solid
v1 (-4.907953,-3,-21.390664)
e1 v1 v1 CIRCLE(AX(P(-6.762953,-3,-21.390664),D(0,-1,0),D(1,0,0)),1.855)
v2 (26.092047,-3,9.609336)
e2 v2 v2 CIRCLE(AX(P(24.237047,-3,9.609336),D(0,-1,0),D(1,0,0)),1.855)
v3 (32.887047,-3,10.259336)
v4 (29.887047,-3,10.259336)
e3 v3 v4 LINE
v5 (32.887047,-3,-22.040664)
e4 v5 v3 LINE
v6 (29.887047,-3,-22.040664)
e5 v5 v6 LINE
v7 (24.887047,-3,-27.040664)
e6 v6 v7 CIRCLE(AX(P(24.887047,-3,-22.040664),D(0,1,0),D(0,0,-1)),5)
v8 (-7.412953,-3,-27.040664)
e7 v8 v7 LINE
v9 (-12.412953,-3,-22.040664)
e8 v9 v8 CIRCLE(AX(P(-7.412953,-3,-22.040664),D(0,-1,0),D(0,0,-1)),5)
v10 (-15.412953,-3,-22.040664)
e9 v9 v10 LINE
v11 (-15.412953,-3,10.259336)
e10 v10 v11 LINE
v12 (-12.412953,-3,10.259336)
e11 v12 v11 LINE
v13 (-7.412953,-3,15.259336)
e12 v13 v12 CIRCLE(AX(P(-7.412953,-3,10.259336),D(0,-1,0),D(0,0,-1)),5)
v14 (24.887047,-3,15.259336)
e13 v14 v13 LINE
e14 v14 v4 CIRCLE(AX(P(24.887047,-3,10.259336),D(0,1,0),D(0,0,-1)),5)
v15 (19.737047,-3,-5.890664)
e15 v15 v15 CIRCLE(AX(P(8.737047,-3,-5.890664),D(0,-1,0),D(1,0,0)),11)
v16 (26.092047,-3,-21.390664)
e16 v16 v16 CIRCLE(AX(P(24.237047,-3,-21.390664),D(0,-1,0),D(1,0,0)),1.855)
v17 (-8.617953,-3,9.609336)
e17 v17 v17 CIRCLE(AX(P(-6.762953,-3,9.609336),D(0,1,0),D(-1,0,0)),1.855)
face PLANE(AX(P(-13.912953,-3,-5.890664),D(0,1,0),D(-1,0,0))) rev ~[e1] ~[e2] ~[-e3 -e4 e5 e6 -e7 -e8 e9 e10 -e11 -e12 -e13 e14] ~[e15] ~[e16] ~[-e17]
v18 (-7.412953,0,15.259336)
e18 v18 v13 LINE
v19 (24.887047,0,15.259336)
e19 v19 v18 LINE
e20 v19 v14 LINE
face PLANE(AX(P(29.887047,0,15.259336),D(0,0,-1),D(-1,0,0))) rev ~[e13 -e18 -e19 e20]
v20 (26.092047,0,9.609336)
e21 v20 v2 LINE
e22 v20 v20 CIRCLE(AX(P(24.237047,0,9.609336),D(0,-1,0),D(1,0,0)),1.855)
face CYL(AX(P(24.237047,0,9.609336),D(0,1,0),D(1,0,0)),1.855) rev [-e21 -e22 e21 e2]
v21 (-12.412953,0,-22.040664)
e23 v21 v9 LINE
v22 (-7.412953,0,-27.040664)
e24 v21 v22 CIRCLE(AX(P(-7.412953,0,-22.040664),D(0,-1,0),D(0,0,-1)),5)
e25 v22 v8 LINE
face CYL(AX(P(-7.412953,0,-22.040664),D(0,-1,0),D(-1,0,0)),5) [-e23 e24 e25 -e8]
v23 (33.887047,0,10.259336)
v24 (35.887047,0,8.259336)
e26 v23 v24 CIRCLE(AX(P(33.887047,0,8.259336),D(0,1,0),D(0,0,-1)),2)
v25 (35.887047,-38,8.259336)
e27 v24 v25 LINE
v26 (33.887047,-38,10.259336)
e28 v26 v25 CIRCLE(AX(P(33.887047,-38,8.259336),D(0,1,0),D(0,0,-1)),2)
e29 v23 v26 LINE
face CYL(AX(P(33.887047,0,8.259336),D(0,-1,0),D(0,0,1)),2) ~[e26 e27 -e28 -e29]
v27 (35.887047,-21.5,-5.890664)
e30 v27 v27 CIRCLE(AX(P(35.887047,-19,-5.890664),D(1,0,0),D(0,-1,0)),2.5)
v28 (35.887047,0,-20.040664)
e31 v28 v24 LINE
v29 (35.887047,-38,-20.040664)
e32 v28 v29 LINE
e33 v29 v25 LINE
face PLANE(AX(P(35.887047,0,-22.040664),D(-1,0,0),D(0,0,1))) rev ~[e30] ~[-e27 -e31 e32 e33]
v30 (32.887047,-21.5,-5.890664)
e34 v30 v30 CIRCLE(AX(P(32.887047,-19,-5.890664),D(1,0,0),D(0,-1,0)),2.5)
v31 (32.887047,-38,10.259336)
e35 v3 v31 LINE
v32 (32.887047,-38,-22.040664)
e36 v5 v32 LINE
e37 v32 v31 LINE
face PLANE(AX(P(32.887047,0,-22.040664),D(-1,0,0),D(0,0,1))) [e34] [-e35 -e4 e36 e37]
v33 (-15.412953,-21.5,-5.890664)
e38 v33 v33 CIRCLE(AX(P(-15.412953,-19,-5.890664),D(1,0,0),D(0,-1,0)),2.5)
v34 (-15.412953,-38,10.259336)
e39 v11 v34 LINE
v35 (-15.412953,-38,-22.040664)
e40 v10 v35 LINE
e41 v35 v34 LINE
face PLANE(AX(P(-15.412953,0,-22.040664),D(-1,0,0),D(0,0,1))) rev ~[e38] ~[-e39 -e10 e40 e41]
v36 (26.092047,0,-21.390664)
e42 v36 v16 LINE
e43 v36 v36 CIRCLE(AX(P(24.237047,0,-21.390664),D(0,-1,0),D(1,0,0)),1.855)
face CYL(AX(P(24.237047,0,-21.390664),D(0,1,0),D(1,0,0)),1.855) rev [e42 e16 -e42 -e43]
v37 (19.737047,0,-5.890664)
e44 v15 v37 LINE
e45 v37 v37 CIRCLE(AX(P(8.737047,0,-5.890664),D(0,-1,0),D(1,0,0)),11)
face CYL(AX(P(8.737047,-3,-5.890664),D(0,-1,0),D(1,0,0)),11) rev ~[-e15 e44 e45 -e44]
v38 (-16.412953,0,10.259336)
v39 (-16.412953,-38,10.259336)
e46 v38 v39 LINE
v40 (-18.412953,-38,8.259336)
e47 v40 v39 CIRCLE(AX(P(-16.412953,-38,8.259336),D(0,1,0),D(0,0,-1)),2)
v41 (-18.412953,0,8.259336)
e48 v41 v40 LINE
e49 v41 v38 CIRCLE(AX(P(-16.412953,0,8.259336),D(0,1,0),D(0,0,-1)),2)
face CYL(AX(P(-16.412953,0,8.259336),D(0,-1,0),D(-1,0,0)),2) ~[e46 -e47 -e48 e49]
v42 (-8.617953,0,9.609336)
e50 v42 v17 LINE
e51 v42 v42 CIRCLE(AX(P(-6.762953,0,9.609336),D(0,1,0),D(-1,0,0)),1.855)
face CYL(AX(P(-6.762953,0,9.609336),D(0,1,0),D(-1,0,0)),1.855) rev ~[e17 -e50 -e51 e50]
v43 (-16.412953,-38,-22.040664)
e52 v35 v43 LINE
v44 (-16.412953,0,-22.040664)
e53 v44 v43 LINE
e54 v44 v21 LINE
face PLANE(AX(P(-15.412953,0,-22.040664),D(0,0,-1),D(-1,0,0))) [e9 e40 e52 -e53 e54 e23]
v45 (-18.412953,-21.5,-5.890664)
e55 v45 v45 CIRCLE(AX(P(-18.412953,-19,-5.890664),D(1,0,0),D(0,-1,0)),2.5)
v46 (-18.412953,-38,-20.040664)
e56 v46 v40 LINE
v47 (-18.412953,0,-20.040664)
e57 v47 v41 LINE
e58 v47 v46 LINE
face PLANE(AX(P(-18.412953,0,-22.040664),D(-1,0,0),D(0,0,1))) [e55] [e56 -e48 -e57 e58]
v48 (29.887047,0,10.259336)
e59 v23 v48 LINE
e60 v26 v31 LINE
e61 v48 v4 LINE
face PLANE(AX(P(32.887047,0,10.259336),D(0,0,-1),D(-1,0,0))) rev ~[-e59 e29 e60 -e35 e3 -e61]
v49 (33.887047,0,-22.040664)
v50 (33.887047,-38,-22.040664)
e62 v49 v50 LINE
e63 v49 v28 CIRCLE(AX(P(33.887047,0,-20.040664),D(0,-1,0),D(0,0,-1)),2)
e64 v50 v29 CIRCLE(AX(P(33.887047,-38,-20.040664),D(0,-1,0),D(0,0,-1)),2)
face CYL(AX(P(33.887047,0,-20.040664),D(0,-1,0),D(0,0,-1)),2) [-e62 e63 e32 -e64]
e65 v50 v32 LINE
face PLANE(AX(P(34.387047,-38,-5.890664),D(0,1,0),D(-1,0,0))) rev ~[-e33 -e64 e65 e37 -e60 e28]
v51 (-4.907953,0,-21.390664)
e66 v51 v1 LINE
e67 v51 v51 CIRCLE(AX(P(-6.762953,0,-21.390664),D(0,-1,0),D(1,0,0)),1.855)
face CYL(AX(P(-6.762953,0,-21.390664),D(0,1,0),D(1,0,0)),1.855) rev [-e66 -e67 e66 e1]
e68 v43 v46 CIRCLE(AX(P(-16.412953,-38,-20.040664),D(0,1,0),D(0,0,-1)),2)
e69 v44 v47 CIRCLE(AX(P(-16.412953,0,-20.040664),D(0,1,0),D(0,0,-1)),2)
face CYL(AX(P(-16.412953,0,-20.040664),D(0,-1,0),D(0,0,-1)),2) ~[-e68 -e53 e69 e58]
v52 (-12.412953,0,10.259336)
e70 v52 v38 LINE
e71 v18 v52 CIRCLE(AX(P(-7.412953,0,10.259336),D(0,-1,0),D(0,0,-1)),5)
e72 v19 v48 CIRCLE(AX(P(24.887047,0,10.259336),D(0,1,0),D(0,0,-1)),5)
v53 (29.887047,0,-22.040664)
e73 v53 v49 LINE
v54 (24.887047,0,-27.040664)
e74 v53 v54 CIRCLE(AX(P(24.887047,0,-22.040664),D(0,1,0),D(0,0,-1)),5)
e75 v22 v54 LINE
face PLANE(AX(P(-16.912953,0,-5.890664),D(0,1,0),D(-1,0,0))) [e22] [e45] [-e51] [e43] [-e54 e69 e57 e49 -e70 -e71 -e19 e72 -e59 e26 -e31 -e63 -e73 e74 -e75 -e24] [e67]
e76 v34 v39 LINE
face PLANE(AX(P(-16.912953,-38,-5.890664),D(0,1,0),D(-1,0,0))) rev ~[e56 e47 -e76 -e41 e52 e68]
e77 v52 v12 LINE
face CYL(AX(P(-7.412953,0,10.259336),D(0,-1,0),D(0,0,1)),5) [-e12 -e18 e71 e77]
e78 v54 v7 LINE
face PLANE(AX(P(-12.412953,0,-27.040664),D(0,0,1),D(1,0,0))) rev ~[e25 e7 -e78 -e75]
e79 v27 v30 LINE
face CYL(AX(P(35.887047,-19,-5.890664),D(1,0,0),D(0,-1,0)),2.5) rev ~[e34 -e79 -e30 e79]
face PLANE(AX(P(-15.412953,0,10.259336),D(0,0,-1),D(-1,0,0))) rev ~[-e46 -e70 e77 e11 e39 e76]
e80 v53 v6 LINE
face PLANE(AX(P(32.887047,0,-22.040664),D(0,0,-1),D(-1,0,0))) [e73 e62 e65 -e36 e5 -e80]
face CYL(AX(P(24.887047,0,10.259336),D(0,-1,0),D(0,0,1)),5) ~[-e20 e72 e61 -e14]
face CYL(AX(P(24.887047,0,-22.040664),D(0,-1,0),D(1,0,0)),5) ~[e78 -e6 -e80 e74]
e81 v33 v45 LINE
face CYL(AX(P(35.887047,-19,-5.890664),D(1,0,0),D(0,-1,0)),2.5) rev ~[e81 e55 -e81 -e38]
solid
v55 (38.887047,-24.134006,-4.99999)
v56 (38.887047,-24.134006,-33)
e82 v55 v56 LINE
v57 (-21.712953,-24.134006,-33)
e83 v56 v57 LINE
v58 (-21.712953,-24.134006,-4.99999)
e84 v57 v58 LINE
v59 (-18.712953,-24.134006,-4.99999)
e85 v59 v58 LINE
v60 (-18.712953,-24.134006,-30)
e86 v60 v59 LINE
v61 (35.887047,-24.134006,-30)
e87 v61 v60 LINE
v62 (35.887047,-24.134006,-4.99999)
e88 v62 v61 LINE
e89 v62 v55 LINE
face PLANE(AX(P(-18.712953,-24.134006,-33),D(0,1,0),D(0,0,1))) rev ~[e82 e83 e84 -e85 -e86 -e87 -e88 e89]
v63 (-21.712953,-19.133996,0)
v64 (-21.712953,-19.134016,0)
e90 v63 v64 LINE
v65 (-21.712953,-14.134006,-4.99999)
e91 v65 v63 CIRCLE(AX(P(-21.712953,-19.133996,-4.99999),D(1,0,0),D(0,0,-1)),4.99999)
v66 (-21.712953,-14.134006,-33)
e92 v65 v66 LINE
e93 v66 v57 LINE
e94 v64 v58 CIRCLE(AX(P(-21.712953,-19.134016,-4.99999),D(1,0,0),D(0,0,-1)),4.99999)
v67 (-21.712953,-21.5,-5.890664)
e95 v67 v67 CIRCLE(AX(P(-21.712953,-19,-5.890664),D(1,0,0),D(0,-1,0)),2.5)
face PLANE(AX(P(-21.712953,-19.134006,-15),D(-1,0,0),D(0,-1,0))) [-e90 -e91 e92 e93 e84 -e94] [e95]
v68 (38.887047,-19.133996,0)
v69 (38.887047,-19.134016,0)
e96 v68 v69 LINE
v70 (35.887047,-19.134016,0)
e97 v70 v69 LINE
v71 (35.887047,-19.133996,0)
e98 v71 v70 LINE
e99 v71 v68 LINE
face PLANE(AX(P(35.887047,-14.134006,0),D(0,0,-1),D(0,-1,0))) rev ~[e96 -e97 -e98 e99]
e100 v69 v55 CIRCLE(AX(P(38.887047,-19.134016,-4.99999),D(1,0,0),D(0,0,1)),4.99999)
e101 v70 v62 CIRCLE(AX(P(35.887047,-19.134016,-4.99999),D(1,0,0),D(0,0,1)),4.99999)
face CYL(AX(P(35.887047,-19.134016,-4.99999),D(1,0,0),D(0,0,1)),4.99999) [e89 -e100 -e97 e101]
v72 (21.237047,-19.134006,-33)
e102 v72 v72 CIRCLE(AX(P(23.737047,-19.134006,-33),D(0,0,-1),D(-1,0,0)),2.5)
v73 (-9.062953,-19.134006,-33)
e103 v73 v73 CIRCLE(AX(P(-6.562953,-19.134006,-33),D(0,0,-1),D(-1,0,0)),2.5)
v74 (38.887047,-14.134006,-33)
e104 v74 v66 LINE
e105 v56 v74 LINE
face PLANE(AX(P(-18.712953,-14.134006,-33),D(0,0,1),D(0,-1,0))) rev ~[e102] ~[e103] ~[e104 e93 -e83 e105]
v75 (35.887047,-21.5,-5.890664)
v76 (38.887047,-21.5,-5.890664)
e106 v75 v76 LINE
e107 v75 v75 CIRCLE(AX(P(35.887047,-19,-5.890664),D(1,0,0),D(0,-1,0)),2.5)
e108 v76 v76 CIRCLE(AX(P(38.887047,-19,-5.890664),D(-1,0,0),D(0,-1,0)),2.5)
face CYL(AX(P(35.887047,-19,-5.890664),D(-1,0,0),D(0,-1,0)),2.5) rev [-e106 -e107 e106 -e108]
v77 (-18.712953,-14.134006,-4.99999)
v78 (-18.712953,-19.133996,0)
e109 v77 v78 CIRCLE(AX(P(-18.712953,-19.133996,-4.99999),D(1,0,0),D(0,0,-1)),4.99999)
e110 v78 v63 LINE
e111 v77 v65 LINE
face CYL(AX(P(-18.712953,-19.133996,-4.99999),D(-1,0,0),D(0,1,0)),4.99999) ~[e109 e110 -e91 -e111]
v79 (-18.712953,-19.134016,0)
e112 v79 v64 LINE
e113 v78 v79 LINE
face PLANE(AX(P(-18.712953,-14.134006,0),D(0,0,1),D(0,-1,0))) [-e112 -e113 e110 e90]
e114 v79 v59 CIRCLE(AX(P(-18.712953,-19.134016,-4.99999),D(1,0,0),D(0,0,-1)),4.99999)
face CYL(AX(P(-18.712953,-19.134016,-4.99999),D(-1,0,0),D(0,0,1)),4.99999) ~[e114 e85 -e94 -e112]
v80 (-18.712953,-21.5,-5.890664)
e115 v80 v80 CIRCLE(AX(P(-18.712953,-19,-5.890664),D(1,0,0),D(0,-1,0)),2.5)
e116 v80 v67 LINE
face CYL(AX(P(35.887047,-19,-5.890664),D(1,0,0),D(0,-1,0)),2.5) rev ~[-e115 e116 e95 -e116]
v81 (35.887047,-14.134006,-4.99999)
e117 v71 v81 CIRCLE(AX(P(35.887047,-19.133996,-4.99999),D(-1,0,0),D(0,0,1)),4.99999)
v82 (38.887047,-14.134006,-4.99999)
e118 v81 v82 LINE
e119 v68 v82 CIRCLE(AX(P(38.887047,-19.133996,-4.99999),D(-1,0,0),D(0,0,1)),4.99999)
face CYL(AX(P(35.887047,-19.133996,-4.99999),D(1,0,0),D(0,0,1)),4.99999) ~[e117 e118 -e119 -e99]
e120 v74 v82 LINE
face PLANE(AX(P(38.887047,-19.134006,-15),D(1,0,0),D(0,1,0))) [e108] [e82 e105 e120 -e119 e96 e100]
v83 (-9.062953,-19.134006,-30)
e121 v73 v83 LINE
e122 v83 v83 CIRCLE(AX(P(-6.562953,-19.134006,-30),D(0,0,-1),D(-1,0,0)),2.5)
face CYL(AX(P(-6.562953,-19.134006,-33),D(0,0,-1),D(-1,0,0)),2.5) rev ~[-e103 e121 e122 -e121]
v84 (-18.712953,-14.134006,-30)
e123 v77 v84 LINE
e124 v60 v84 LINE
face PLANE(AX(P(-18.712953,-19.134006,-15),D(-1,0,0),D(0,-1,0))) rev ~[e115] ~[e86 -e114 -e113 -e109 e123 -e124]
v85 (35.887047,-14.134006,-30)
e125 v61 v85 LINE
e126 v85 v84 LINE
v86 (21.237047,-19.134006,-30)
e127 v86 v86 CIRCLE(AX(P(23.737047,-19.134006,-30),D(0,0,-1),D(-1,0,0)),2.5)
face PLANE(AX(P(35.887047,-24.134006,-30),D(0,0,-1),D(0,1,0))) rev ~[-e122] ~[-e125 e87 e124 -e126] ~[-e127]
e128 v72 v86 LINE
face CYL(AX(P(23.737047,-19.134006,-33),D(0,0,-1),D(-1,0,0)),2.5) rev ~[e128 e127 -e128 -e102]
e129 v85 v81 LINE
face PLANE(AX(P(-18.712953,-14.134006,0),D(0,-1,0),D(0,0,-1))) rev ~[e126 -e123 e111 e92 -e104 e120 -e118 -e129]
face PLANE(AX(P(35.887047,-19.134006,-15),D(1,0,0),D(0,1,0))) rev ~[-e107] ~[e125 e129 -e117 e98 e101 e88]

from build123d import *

# Parameters (mm, degrees)
F0_R           = 1.855
F1_DEPTH       = 3
F2_R           = 5
F3_W           = 3
F3_H           = 32.3
F4_DEPTH       = 3
F5_DEPTH       = 38
F6_R           = 2
F8_R           = 11
F9_DEPTH       = 3.001
F10_W          = 10
F10_H          = 3
F11_DEPTH      = 3
F12_R          = 4.99999
F13_DEPTH      = 54.6
F14_W          = 10
F14_H          = 30
F14_H_2        = 3
F15_DEPTH      = 3
F16_DEPTH      = 57.601
F16_DEPTH_BACK = 3.001
F17_R          = 4.99999
F19_DEPTH      = 25


# Not quite as in the source:
# - a fillet or chamfer is up to 0.001 mm smaller than in the source, because OpenCascade refuses the exact size


with BuildPart() as f1:
    # F0 (on Front) → F1 (new body)
    with BuildSketch(Plane.XZ):
        Polygon((29.887046665, 15.2593358934), (-12.412953335, 15.2593358934), (-12.412953335, 9.6093358934), (-12.412953335, -27.0406641066), (29.887046665, -27.0406641066), align=None)
        with Locations((-6.762953335, -21.3906641066)):
            Circle(F0_R, mode=Mode.SUBTRACT)
        with Locations((24.237046665, -21.3906641066)):
            Circle(F0_R, mode=Mode.SUBTRACT)
        with BuildLine():
            ThreePointArc((-4.907953335, 9.6093358934), (-6.762953335, 7.7543358934), (-8.617953335, 9.6093358934))
            ThreePointArc((-8.617953335, 9.6093358934), (-6.762953335, 11.4643358934), (-4.907953335, 9.6093358934))
        make_face(mode=Mode.SUBTRACT)
        with Locations((24.237046665, 9.6093358934)):
            Circle(F0_R, mode=Mode.SUBTRACT)
    extrude(amount=F1_DEPTH)

    # F2
    f2_edges = [f1.edges().sort_by_distance(p)[0] for p in [
        (29.887047, -1.5, 15.259336),
        (29.887047, -1.5, -27.040664),
        (-12.412953, -1.5, 15.259336),
        (-12.412953, -1.5, -27.040664),
    ]]
    fillet(f2_edges, radius=F2_R)

    # F3 (on face) → F4 (join)
    with BuildSketch(Plane(origin=(0, 0, 0), x_dir=(-1, 0, 0), z_dir=(0, 1, 0))):
        with Locations((13.912953335, -5.8906641066)):
            Rectangle(F3_W, F3_H)
        with Locations((-31.387046665, -5.8906641066)):
            Rectangle(F3_W, F3_H)
    extrude(amount=-F4_DEPTH)

    # F3 (on face) → F5 (join)
    with BuildSketch(Plane(origin=(0, 0, 0), x_dir=(-1, 0, 0), z_dir=(0, 1, 0))):
        with Locations((16.912953335, -5.8906641066)):
            Rectangle(F3_W, F3_H)
        with Locations((-34.387046665, -5.8906641066)):
            Rectangle(F3_W, F3_H)
    extrude(amount=-F5_DEPTH)

    # F6
    f6_edges = [f1.edges().sort_by_distance(p)[0] for p in [
        (35.887047, -19, -22.040664),
        (-18.412953, -19, -22.040664),
        (-18.412953, -19, 10.259336),
        (35.887047, -19, 10.259336),
    ]]
    fillet(f6_edges, radius=F6_R)

    # F8 (on face) → F9 (cut, through all)
    with BuildSketch(Plane.XZ.offset(3)):
        with Locations((8.737046665, -5.8906641066)):
            Circle(F8_R)
    extrude(amount=-F9_DEPTH, mode=Mode.SUBTRACT)


with BuildPart() as f11:
    # F10 (on face) → F11 (new body)
    with BuildSketch(Plane.YZ.offset(35.887046665)):
        Polygon((-14.1340063512, 0), (-19, 0), (-24.1340063512, 0), (-24.1340063512, -30), (-14.1340063512, -30), align=None)
        with Locations((-19.1340063512, -31.5)):
            Rectangle(F10_W, F10_H)
    extrude(amount=F11_DEPTH)

    # F12 (radius 5 in the source; OpenCascade refuses exactly that, so slightly less here)
    f12_edges = [f11.edges().sort_by_distance(p)[0] for p in [
        (37.387047, -24.134006, 0),
        (37.387047, -14.134006, 0),
    ]]
    fillet(f12_edges, radius=F12_R)

    # F10 (on face) → F13 (join)
    with BuildSketch(Plane.YZ.offset(35.887046665)):
        with Locations((-19.1340063512, -31.5)):
            Rectangle(F10_W, F10_H)
    extrude(amount=-F13_DEPTH)

    # F14 (on face) → F15 (join)
    with BuildSketch(Plane(origin=(-18.712953335, 0, 0), x_dir=(0, -1, 0), z_dir=(-1, 0, 0))):
        with Locations((19.1340063512, -15)):
            Rectangle(F14_W, F14_H)
        with Locations((19.1340063512, -31.5)):
            Rectangle(F14_W, F14_H_2)
    extrude(amount=F15_DEPTH)


with BuildPart() as f16_tool:
    # F7 (on face) → F16 (new body, two sides)
    with BuildSketch(Plane.YZ.offset(35.887046665)) as f16_sk:
        with BuildLine():
            Line((-21.5, -5.8906641066), (-19, -5.8906641066))
            Line((-19, -5.8906641066), (-16.5, -5.8906641066))
            ThreePointArc((-16.5, -5.8906641066), (-19, -3.3906641066), (-21.5, -5.8906641066))
        make_face()
        with BuildLine():
            Line((-16.5, -5.8906641066), (-19, -5.8906641066))
            Line((-19, -5.8906641066), (-21.5, -5.8906641066))
            ThreePointArc((-21.5, -5.8906641066), (-19, -8.3906641066), (-16.5, -5.8906641066))
        make_face()
    extrude(amount=-F16_DEPTH)
    extrude(f16_sk.sketch, amount=F16_DEPTH_BACK)


with BuildPart() as f1_1:
    add(f1.part)

    # F16: cut by f16_tool
    add(f16_tool.part, mode=Mode.SUBTRACT)


with BuildPart() as f11_1:
    add(f11.part)

    # F16: cut by f16_tool
    add(f16_tool.part, mode=Mode.SUBTRACT)

    # F17 (radius 5 in the source; OpenCascade refuses exactly that, so slightly less here)
    f17_edges = [f11_1.edges().sort_by_distance(p)[0] for p in [
        (-20.212953, -14.134006, 0),
        (-20.212953, -24.134006, 0),
    ]]
    fillet(f17_edges, radius=F17_R)

    # F18 (on face) → F19 (cut)
    with BuildSketch(Plane(origin=(0, 0, -33), x_dir=(1, 0, 0), z_dir=(0, 0, -1))):
        with BuildLine():
            Line((-9.062953335, 19.1340063512), (-6.562953335, 19.1340063512))
            Line((-6.562953335, 19.1340063512), (-4.062953335, 19.1340063512))
            ThreePointArc((-4.062953335, 19.1340063512), (-6.562953335, 21.6340063512), (-9.062953335, 19.1340063512))
        make_face()
        with BuildLine():
            Line((-4.062953335, 19.1340063512), (-6.562953335, 19.1340063512))
            Line((-6.562953335, 19.1340063512), (-9.062953335, 19.1340063512))
            ThreePointArc((-9.062953335, 19.1340063512), (-6.562953335, 16.6340063512), (-4.062953335, 19.1340063512))
        make_face()
        with BuildLine():
            ThreePointArc((26.237046665, 19.1340063512), (23.737046665, 21.6340063512), (21.237046665, 19.1340063512))
            Line((21.237046665, 19.1340063512), (23.737046665, 19.1340063512))
            Line((23.737046665, 19.1340063512), (26.237046665, 19.1340063512))
        make_face()
        with BuildLine():
            Line((23.737046665, 19.1340063512), (21.237046665, 19.1340063512))
            ThreePointArc((21.237046665, 19.1340063512), (23.737046665, 16.6340063512), (26.237046665, 19.1340063512))
            Line((26.237046665, 19.1340063512), (23.737046665, 19.1340063512))
        make_face()
    extrude(amount=-F19_DEPTH, mode=Mode.SUBTRACT)


solid = Compound([f1_1.part, f11_1.part])
